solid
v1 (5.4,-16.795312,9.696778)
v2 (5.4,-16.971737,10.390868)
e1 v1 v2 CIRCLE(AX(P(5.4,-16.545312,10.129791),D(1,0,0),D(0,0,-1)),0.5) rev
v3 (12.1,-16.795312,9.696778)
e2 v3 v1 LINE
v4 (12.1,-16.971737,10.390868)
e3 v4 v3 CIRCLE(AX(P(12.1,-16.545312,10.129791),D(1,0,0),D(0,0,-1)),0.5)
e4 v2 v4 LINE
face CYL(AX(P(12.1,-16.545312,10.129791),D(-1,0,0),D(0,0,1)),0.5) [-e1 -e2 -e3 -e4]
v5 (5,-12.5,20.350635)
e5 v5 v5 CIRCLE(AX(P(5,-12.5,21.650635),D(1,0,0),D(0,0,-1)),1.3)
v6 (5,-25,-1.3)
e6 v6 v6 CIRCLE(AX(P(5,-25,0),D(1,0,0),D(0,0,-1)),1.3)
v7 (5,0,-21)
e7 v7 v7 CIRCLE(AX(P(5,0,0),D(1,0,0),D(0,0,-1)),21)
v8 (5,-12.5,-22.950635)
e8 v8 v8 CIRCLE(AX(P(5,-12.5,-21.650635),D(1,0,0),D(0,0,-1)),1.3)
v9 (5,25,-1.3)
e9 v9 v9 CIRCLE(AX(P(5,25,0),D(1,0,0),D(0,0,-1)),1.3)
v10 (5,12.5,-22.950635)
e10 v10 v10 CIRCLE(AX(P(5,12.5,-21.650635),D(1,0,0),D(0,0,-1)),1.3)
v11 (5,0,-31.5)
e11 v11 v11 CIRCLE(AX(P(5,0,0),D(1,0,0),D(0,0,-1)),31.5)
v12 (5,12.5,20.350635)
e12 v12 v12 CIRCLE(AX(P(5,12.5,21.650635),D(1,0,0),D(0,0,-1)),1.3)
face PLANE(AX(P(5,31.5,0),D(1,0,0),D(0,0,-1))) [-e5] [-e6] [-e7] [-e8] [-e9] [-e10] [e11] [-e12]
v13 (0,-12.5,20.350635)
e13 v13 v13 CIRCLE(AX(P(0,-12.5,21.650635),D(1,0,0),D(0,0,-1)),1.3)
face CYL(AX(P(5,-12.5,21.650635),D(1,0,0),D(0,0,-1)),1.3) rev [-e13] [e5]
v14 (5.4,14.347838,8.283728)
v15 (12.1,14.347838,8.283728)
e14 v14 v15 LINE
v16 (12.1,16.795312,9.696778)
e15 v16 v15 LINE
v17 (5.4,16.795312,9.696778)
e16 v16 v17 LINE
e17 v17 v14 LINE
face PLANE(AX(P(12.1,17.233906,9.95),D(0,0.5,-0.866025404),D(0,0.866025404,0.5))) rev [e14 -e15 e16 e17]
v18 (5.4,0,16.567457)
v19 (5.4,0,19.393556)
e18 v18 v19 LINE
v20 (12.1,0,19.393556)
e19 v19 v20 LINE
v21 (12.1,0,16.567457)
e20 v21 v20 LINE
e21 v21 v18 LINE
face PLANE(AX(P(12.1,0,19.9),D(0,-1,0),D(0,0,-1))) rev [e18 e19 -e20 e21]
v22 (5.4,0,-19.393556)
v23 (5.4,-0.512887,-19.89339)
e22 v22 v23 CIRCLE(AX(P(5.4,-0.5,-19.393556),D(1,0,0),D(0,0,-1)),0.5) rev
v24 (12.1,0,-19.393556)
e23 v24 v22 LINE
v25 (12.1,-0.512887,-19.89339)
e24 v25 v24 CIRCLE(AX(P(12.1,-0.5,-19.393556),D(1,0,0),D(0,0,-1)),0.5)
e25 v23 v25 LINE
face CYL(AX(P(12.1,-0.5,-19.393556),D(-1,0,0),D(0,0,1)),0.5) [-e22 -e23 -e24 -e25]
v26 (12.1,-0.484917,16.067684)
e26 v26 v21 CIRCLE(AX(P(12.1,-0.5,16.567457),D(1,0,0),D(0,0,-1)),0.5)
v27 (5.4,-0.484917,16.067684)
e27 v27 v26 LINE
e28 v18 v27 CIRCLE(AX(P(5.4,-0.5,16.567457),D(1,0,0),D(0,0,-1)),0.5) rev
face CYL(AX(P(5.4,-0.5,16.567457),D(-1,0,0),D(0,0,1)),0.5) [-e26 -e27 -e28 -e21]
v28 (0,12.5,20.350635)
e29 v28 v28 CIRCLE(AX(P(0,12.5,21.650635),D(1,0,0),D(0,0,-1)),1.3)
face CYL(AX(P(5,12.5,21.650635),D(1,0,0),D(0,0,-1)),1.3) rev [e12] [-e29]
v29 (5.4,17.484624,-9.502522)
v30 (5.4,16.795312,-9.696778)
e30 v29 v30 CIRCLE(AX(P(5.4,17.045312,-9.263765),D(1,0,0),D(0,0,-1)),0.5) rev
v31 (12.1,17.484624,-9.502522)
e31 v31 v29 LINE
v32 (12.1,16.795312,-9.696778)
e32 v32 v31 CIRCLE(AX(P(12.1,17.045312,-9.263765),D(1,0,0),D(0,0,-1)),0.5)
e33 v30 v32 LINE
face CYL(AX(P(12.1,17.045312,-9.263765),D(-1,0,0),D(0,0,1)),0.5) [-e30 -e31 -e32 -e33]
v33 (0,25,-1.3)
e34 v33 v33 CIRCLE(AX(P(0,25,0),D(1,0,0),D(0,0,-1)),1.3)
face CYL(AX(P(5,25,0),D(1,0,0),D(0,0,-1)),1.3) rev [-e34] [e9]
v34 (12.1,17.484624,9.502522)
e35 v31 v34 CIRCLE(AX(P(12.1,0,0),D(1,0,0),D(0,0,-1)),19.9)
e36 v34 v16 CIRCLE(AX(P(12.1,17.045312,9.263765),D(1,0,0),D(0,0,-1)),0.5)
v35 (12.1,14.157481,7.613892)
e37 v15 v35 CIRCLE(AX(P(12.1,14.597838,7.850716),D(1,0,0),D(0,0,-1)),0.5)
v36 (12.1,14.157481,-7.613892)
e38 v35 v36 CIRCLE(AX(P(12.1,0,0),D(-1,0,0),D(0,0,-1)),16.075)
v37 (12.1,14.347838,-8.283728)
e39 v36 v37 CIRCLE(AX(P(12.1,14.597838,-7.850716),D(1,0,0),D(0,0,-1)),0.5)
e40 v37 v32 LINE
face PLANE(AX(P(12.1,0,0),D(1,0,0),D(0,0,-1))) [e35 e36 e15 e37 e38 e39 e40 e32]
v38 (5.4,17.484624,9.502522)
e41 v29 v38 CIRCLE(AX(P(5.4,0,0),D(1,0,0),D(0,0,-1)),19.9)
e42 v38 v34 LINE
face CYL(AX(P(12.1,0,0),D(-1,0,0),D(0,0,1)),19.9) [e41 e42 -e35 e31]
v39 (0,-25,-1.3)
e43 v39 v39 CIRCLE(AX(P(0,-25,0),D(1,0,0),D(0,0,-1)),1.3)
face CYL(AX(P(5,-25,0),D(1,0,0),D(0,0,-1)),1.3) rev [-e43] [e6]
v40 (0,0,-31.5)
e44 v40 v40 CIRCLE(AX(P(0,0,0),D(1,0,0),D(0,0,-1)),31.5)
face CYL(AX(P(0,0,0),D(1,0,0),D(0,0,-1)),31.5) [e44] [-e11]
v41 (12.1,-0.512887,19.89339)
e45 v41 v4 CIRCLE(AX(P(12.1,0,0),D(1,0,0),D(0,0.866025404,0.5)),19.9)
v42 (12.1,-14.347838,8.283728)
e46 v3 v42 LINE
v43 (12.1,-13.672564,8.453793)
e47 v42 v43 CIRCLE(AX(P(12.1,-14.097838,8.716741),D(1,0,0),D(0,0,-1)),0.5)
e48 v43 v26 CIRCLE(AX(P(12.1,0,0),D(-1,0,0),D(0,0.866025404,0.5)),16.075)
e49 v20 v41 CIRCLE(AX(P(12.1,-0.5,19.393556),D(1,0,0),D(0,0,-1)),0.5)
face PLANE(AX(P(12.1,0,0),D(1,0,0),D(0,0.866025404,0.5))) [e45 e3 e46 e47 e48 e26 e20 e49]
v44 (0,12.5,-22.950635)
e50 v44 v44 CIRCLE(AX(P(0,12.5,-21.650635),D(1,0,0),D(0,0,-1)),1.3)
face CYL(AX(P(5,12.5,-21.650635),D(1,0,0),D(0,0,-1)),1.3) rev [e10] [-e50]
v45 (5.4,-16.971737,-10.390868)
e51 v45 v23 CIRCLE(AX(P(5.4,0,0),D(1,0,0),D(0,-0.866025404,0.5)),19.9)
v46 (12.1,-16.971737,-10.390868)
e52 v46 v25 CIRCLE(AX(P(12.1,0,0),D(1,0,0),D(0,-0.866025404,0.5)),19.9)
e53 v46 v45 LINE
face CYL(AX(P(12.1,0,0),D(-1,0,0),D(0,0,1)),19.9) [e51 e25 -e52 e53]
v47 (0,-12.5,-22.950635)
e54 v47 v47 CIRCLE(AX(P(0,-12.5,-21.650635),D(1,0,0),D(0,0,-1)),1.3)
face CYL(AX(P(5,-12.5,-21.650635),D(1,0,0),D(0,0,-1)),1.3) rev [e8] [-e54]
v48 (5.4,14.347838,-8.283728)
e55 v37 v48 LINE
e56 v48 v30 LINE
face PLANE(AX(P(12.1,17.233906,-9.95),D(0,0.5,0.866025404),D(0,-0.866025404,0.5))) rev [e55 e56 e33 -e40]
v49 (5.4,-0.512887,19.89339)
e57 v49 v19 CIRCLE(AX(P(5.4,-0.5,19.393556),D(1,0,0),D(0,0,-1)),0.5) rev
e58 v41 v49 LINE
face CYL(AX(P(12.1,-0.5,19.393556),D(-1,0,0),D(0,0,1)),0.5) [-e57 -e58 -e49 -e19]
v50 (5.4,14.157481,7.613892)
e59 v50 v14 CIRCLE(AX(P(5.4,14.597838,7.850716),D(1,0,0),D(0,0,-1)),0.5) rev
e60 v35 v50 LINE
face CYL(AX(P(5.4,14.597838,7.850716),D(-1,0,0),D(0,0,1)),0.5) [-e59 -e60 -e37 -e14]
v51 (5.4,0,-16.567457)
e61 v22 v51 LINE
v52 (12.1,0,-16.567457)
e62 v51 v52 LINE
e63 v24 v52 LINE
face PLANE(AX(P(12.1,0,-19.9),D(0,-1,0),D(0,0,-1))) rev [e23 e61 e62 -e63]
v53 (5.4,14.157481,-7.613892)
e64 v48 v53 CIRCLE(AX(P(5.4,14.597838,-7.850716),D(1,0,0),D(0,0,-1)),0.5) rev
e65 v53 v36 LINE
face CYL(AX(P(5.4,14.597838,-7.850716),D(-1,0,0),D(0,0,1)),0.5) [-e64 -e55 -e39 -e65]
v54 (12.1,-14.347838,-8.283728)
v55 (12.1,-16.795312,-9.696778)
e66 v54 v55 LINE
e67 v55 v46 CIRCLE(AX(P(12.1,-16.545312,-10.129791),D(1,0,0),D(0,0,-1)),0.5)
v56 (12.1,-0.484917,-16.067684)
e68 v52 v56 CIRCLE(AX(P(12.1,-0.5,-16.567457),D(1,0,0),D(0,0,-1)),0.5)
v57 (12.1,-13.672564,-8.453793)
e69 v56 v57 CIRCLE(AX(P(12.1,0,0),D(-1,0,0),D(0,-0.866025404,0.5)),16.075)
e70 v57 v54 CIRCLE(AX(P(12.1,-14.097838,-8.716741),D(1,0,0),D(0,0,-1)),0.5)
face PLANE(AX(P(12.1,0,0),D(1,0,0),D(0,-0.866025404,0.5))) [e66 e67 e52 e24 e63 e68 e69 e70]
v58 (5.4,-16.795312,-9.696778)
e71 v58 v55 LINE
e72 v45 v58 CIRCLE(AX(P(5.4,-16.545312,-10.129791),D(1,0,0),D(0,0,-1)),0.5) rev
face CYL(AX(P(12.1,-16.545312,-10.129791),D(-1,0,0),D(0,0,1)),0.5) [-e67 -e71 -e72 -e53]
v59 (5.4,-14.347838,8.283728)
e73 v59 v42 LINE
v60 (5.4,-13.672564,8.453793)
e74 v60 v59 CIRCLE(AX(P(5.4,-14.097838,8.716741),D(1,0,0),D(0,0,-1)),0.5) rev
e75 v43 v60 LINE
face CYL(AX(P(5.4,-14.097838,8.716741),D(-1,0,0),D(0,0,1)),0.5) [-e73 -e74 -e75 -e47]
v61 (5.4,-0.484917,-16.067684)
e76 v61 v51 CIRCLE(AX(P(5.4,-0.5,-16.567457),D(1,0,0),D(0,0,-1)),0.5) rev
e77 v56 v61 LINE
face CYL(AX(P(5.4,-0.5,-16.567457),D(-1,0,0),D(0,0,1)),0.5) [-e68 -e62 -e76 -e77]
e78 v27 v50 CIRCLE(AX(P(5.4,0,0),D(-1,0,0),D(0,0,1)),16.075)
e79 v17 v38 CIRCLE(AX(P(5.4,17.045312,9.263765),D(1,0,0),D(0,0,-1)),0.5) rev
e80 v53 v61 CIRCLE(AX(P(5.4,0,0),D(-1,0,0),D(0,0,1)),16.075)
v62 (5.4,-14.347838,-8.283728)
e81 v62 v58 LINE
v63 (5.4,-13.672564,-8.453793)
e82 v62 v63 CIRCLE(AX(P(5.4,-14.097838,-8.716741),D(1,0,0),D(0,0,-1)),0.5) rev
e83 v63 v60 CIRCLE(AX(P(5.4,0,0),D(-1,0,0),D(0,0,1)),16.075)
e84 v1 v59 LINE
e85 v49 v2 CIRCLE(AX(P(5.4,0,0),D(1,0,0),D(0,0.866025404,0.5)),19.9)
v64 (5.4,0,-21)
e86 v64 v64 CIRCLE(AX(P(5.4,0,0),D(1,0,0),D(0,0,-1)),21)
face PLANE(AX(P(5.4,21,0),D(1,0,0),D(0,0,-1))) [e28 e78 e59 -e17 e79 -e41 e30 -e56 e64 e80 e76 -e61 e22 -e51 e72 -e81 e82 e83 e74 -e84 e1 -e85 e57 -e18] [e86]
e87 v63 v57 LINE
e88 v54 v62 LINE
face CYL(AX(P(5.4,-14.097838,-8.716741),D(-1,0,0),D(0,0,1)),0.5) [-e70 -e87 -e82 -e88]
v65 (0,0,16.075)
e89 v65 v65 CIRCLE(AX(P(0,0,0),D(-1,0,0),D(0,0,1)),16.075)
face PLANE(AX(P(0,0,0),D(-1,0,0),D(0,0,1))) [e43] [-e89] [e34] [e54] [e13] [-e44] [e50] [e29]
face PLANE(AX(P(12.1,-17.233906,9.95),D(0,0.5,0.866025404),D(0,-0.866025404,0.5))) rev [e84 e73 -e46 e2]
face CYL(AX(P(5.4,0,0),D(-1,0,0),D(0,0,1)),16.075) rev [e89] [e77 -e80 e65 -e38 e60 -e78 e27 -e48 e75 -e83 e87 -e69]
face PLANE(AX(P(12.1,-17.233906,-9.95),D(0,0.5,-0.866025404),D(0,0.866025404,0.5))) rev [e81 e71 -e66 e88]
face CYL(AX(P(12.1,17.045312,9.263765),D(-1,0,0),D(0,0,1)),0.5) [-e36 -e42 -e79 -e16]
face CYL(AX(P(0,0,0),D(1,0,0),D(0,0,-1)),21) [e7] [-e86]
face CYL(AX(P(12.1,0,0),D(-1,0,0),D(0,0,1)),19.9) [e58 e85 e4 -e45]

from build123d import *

# Parameters (mm, degrees)
SKIZZE2_R                        = 16.075
SCHNITT_LINEAR_AUSTRAGEN1_DEPTH  = 45.873823104344474
F_2_6_2_6_DURCHMESSER_BOHRUNG1_D = 2.6
KREISMUSTER1_COUNT               = 6
AUFSATZ_LINEAR_AUSTRAGEN1_DEPTH  = 6.7
VERRUNDUNG1_R                    = 0.5
KREISMUSTER2_START               = 5.4
KREISMUSTER2_DEPTH               = 6.7


# Read off the part's stored shape, not the designer's step: Kreismuster2
with BuildPart() as part:
    # Skizze1 → Rotation1 (revolve)
    with BuildSketch(Plane.XY, mode=Mode.PRIVATE) as rotation1_sk:
        Polygon((0, 0), (0, 31.5), (4.999999999999999, 31.5), (5.000000000000001, 20.999999999999996), (5.4, 21), (5.4, 0), align=None)
    revolve(rotation1_sk.sketch.rotate(Axis((0, 0, 0), (-1, 0, 0)), 90), axis=Axis((0, 0, 0), (-1, 0, 0)))

    # Skizze2 → Schnitt-Linear austragen1 (cut, through all)
    with BuildSketch(Plane.ZY):
        Circle(SKIZZE2_R)
    extrude(amount=-SCHNITT_LINEAR_AUSTRAGEN1_DEPTH, mode=Mode.SUBTRACT)

    # Ø2.6 (2.6) Durchmesser Bohrung1 (through all)
    with Locations(Plane(origin=(5, 0, 0), x_dir=(0, 0, -1), z_dir=(1, 0, 0))):
        with Locations((0, 25)):
            f_2_6_2_6_durchmesser_bohrung1 = Hole(F_2_6_2_6_DURCHMESSER_BOHRUNG1_D / 2)

    # Kreismuster1: Ø2.6 (2.6) Durchmesser Bohrung1 ×6 about axis
    kreismuster1_axis = Axis((0, -7.2e-16, -2.984e-14), (1, 0, 0))
    for i in range(1, KREISMUSTER1_COUNT):
        add(f_2_6_2_6_durchmesser_bohrung1.rotate(kreismuster1_axis, i * 360 / KREISMUSTER1_COUNT), mode=Mode.SUBTRACT)

    # Skizze5 → Aufsatz-Linear austragen1 (add)
    with BuildSketch(Plane(origin=(5.4, 0, 0), x_dir=(0, 0, -1), z_dir=(1, 0, 0))):
        with BuildLine():
            Line((-9.950000000000019, 17.233905535310317), (-8.037500000000017, 13.921358365834841))
            ThreePointArc((-8.037500000000017, 13.921358365834841), (9.8e-16, 16.075), (8.037500000000014, 13.921358365834843))
            Line((8.037500000000014, 13.921358365834843), (9.950000000000017, 17.233905535310317))
            ThreePointArc((9.950000000000017, 17.233905535310317), (1.22e-15, 19.9), (-9.950000000000019, 17.233905535310317))
        make_face()
    extrude(amount=AUFSATZ_LINEAR_AUSTRAGEN1_DEPTH)

    # Verrundung1
    verrundung1_edges = [part.edges().sort_by_distance(p)[0] for p in [
        (8.75, 17.233905535310317, -9.950000000000015),
        (8.75, 17.23390553531032, 9.950000000000017),
        (8.75, 13.921358365834843, 8.03750000000002),
        (8.75, 13.921358365834845, -8.037500000000014),
    ]]
    fillet(verrundung1_edges, radius=VERRUNDUNG1_R)

    # Kreismuster2 outline → Kreismuster2 (add)
    with BuildSketch(Plane.YZ.offset(KREISMUSTER2_START)):
        with BuildLine():
            ThreePointArc((-13.672564308, 8.453792655), (-8.0375, 13.921358366), (-0.484917044, 16.067684353))
            ThreePointArc((-0.484917044, 16.067684353), (-0.1411536, 16.219276879), (0, 16.567456805))
            Line((0, 16.567456805), (0, 19.393555631))
            ThreePointArc((0, 19.393555631), (-0.151032451, 19.751636138), (-0.512886598, 19.893389539))
            ThreePointArc((-0.512886598, 19.893389539), (-9.95, 17.233905535), (-16.971737409, 10.390867592))
            ThreePointArc((-16.971737409, 10.390867592), (-17.029902436, 10.006616008), (-16.795311846, 9.696777815))
            Line((-16.795311846, 9.696777815), (-14.34783847, 8.283728403))
            ThreePointArc((-14.34783847, 8.283728403), (-13.975729009, 8.231881043), (-13.672564308, 8.453792655))
        make_face()
        with BuildLine():
            ThreePointArc((0, -16.567456805), (-0.1411536, -16.219276879), (-0.484917044, -16.067684353))
            ThreePointArc((-0.484917044, -16.067684353), (-8.0375, -13.921358366), (-13.672564308, -8.453792655))
            ThreePointArc((-13.672564308, -8.453792655), (-13.975729009, -8.231881043), (-14.34783847, -8.283728403))
            Line((-14.34783847, -8.283728403), (-16.795311846, -9.696777815))
            ThreePointArc((-16.795311846, -9.696777815), (-17.029902436, -10.006616008), (-16.971737409, -10.390867592))
            ThreePointArc((-16.971737409, -10.390867592), (-9.95, -17.233905535), (-0.512886598, -19.893389539))
            ThreePointArc((-0.512886598, -19.893389539), (-0.151032451, -19.751636138), (0, -19.393555631))
            Line((0, -19.393555631), (0, -16.567456805))
        make_face()
    extrude(amount=KREISMUSTER2_DEPTH)


solid = part.part
